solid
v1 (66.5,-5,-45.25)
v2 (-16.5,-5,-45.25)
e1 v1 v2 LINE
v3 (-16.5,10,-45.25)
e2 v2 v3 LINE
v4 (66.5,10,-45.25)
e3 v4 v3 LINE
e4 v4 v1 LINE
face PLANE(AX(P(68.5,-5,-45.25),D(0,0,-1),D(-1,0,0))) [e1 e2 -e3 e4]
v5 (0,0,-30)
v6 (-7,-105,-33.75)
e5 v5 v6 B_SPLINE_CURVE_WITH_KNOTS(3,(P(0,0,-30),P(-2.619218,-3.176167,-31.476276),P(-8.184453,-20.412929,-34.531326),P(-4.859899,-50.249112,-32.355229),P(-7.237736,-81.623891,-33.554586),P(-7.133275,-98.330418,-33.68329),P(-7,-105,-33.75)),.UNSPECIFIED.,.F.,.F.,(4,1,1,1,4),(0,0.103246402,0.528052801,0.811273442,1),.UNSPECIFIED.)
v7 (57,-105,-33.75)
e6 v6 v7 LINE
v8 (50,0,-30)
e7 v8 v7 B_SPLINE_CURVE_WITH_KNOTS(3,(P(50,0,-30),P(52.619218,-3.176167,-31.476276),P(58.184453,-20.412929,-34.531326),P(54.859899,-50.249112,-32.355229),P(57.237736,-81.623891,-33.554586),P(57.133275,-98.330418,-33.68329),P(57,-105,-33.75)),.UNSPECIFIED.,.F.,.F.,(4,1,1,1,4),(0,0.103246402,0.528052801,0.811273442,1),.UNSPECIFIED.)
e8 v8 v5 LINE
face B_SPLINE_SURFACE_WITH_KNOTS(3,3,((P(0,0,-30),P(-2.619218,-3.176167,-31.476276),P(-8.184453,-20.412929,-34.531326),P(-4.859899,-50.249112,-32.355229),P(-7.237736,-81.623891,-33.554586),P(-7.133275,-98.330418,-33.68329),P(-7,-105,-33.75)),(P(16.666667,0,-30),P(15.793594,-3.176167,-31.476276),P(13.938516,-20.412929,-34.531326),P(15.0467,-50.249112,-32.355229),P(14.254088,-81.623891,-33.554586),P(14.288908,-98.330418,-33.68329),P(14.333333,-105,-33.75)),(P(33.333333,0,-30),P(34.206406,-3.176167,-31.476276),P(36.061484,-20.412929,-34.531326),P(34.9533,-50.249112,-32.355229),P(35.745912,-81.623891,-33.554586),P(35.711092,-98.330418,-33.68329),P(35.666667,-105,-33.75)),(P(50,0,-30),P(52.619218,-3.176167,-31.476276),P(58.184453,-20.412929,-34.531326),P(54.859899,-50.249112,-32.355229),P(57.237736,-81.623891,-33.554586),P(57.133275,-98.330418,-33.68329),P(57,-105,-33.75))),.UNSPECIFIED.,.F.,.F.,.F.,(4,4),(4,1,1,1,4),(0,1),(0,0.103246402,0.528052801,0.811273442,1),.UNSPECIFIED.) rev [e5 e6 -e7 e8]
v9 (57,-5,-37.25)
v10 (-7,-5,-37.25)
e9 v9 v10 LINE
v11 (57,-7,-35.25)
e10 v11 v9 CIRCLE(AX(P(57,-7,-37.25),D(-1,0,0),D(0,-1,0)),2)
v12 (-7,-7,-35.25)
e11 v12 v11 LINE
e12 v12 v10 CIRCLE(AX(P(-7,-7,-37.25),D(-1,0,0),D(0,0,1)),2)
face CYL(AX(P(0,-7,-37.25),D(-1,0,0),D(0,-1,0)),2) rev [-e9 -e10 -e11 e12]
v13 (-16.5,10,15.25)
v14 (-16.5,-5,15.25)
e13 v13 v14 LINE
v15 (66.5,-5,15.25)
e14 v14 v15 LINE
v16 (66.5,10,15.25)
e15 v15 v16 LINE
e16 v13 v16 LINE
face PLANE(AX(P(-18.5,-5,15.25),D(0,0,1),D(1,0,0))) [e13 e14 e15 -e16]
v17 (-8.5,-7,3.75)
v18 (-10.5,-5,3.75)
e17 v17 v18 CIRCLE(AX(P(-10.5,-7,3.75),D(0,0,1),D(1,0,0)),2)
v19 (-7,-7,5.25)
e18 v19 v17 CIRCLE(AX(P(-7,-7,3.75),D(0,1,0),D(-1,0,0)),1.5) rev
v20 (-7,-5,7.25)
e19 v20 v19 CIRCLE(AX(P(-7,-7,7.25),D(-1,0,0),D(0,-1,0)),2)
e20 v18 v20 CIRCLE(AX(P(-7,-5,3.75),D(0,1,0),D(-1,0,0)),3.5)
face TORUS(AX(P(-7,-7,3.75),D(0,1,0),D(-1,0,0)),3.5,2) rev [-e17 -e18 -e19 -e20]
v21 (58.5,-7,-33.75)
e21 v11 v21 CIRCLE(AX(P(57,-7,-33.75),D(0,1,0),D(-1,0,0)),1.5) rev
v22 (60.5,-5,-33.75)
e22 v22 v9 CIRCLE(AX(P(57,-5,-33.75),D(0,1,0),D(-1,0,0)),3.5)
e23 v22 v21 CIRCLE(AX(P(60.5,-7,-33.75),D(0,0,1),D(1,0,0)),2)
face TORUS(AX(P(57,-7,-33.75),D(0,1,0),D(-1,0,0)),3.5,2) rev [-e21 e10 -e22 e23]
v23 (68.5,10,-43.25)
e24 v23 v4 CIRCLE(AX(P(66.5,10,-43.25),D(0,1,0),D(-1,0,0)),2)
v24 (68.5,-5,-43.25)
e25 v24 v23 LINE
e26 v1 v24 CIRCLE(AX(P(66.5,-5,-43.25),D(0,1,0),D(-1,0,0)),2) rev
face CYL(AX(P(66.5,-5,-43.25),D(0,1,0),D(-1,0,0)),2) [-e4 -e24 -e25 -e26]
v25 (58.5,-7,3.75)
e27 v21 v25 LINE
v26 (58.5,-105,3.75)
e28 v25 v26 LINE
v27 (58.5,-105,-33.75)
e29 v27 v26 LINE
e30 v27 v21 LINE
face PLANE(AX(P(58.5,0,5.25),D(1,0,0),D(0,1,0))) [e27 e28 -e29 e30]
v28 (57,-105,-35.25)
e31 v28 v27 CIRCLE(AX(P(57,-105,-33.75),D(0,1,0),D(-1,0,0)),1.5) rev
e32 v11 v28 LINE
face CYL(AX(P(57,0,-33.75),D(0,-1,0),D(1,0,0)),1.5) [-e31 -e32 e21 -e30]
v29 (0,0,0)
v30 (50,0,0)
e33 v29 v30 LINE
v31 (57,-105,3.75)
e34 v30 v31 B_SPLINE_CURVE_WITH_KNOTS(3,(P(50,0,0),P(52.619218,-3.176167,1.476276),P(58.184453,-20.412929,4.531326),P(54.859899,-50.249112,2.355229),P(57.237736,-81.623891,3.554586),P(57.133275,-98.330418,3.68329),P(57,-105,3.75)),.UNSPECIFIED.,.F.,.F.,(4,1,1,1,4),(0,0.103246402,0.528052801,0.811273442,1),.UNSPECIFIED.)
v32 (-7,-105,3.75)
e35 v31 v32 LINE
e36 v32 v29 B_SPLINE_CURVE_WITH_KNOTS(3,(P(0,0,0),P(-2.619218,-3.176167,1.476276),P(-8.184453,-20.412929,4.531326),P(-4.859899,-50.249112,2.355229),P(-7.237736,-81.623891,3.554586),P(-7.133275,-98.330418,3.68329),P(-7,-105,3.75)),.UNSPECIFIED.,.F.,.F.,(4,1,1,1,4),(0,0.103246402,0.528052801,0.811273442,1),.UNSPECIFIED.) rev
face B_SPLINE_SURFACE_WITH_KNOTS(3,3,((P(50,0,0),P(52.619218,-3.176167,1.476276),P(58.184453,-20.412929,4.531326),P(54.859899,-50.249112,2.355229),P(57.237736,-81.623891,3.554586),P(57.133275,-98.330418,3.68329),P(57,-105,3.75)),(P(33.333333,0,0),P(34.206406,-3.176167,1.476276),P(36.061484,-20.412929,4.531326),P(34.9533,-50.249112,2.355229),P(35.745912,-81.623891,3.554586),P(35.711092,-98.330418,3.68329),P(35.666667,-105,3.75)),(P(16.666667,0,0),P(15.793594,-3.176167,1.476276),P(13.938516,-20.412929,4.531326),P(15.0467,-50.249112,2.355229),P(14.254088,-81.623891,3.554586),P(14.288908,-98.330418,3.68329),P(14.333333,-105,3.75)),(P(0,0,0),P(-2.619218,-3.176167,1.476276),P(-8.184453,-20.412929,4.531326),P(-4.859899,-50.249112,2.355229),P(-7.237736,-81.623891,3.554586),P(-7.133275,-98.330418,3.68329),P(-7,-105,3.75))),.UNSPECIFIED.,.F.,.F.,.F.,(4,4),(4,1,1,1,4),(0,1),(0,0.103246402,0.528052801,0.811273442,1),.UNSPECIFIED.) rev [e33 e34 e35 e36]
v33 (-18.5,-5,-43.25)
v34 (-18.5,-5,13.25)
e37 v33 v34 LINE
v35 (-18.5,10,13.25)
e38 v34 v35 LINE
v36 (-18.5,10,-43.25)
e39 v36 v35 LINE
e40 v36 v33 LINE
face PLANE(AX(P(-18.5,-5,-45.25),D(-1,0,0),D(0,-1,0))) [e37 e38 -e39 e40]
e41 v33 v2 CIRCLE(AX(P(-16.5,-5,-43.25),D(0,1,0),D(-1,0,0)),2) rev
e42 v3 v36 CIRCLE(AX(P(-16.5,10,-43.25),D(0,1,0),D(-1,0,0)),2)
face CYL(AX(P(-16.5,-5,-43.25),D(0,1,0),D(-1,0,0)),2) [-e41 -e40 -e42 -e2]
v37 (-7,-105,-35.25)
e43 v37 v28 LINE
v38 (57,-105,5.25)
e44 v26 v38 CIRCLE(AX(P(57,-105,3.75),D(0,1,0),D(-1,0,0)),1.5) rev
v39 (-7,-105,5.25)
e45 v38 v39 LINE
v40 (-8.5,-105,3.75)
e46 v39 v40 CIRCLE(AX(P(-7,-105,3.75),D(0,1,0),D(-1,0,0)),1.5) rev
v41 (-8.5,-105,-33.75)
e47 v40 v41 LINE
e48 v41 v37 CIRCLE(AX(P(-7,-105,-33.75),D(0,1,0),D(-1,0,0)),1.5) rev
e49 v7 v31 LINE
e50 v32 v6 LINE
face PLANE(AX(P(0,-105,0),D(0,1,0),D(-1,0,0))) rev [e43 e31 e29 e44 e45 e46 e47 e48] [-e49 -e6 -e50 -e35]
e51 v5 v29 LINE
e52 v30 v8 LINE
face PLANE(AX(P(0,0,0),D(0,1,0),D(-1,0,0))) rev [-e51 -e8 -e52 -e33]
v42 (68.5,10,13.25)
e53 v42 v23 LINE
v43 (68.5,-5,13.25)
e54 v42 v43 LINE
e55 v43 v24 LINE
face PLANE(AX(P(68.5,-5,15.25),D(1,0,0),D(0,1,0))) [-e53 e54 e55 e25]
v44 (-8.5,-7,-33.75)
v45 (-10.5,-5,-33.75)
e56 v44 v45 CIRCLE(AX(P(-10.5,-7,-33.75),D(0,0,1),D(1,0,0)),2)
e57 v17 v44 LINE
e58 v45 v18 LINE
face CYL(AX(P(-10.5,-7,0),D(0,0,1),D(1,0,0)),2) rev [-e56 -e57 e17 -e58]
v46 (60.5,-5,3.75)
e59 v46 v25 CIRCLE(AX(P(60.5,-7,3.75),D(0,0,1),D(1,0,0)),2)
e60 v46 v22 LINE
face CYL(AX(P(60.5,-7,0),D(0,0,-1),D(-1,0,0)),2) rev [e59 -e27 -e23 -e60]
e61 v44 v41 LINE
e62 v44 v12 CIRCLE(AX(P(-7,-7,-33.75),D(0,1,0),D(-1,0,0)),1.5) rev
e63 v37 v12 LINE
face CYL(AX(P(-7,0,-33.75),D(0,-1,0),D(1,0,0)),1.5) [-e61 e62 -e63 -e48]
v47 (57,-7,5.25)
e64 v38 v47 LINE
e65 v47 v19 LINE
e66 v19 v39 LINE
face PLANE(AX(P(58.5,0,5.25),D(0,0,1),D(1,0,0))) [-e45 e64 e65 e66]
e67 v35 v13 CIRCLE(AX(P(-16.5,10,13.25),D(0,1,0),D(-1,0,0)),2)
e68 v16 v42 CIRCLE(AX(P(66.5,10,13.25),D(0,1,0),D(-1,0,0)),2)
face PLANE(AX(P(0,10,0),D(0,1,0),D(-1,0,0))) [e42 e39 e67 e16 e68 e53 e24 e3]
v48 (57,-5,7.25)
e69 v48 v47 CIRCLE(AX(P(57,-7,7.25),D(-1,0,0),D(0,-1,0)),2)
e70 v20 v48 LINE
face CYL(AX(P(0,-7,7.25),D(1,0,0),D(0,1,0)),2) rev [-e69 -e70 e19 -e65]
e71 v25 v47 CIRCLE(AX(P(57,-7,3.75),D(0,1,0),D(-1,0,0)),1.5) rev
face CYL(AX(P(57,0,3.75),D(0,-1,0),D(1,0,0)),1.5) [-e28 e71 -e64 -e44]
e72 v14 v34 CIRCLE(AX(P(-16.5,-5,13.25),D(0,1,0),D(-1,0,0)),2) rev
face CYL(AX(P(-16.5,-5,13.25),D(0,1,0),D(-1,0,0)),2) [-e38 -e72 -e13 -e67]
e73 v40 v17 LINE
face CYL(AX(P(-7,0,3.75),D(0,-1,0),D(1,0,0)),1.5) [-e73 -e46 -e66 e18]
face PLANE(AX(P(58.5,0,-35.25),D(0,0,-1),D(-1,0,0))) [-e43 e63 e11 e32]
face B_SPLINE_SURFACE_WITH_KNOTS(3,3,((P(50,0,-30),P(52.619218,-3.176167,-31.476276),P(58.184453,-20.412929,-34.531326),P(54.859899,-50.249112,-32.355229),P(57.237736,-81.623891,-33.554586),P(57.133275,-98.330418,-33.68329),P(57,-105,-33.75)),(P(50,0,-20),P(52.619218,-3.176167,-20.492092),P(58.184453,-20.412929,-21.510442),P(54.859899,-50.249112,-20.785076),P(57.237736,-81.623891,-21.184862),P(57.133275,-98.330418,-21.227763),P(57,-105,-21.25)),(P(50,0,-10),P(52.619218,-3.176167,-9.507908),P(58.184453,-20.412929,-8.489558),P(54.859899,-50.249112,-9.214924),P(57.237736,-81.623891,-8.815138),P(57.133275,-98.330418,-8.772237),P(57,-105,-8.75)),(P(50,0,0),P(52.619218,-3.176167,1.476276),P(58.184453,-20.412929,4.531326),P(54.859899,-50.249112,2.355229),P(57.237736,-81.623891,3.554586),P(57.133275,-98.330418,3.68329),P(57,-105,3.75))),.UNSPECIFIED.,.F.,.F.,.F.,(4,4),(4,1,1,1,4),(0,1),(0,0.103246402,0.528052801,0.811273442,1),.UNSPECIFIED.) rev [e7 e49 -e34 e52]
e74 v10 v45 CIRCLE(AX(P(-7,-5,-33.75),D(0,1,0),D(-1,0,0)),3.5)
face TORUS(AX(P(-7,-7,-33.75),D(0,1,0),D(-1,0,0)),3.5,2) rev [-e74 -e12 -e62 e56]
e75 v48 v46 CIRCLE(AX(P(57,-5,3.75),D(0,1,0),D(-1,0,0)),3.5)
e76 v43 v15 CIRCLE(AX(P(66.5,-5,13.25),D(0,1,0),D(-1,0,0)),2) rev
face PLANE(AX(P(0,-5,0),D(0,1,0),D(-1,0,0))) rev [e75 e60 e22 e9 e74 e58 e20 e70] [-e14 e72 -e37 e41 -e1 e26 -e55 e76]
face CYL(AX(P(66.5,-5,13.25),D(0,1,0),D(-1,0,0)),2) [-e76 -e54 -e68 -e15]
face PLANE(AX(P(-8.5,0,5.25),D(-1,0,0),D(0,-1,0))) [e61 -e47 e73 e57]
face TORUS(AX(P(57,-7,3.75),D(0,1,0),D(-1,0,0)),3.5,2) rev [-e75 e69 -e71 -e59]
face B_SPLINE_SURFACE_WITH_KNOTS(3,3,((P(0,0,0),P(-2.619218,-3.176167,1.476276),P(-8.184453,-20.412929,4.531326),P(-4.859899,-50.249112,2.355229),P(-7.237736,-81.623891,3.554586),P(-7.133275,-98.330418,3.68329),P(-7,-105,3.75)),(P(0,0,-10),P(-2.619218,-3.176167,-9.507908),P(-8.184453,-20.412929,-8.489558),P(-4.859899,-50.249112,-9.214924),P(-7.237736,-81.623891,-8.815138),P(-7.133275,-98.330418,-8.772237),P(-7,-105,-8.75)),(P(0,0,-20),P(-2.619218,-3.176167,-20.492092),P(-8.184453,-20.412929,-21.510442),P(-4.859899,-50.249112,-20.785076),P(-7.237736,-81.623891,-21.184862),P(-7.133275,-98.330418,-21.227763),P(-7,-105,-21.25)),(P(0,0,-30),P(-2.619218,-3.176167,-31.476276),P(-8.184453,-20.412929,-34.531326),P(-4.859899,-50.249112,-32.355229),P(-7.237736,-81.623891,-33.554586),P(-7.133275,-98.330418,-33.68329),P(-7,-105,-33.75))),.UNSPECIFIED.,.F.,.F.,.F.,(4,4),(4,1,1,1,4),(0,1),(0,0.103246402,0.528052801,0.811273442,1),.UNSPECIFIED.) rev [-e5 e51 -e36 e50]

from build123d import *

# Parameters (mm, degrees)
SKETCH6_W           = 67
SKETCH6_H           = 40.5
BOSS_EXTRUDE1_DEPTH = 105
CUT_LOFT3_START     = -29.9999999
CUT_LOFT3_DEPTH     = 29.9999998
CUT_LOFT3_START_2   = -7.115817743
CUT_LOFT3_2_DEPTH   = 64.231635486
CUT_LOFT3_START_3   = -35
CUT_LOFT3_3_DEPTH   = 40
SKETCH7_W           = 67
SKETCH7_H           = 40.5
BOSS_EXTRUDE2_DEPTH = 10
SKETCH8_W           = 87
SKETCH8_H           = 60.5
SKETCH8_W_2         = 67
SKETCH8_H_2         = 40.5
BOSS_EXTRUDE3_DEPTH = 15
FILLET1_R           = 1.5
FILLET2_R           = 2


with BuildPart() as part:
    # Sketch6 → Boss-Extrude1 (new body)
    with BuildSketch(Plane(origin=(0, -105, 0), x_dir=(-1, 0, 0), z_dir=(0, -1, 0))):
        with Locations((-25, 15)):
            Rectangle(SKETCH6_W, SKETCH6_H)
    extrude(amount=-BOSS_EXTRUDE1_DEPTH)

    # Cut-Loft3: read off the stored shape, not the designer's step
    # Cut-Loft3 outline → Cut-Loft3 (cut)
    with BuildSketch(Plane.XY.offset(CUT_LOFT3_START)):
        with BuildLine():
            Line((50, 0), (0, 0))
            add(Edge.make_bspline(
                [(0, 0), (-2.619218241, -3.17616721), (-8.184453474, -20.412928603), (-4.859899163, -50.249112036), (-7.237735503, -81.623890808), (-7.133275036, -98.330418488), (-7, -105)],
                knots=[0, 0, 0, 0, 0.103246402, 0.528052801, 0.811273442, 1, 1, 1, 1], degree=3))
            Line((-7, -105), (57, -105))
            add(Edge.make_bspline(
                [(50, 0), (52.619218241, -3.17616721), (58.184453474, -20.412928603), (54.859899163, -50.249112036), (57.237735503, -81.623890808), (57.133275036, -98.330418488), (57, -105)],
                knots=[0, 0, 0, 0, 0.103246402, 0.528052801, 0.811273442, 1, 1, 1, 1], degree=3))
        make_face()
    extrude(amount=CUT_LOFT3_DEPTH, mode=Mode.SUBTRACT)

    # Cut-Loft3 2 outline → Cut-Loft3 2 (cut)
    with BuildSketch(Plane.YZ.offset(CUT_LOFT3_START_2)):
        with BuildLine():
            Line((-105, 3.75), (-105, -1e-07))
            Line((-105, -1e-07), (0, 0))
            add(Edge.make_bspline(
                [(0, 0), (-3.17616721, 1.476275787), (-20.412928603, 4.531326169), (-50.249112036, 2.35522903), (-81.623890808, 3.554586021), (-98.330418488, 3.683289611), (-105, 3.75)],
                knots=[0, 0, 0, 0, 0.103246402, 0.528052801, 0.811273442, 1, 1, 1, 1], degree=3))
        make_face()
        with BuildLine():
            add(Edge.make_bspline(
                [(0, -30), (-3.17616721, -31.476275787), (-20.412928603, -34.531326169), (-50.249112036, -32.35522903), (-81.623890808, -33.554586021), (-98.330418488, -33.683289611), (-105, -33.75)],
                knots=[0, 0, 0, 0, 0.103246402, 0.528052801, 0.811273442, 1, 1, 1, 1], degree=3))
            Line((0, -30), (-105, -29.9999999))
            Line((-105, -29.9999999), (-105, -33.75))
        make_face()
    extrude(amount=CUT_LOFT3_2_DEPTH, mode=Mode.SUBTRACT)

    # Cut-Loft3 3 outline → Cut-Loft3 3 (add)
    with BuildSketch(Plane.XY.offset(CUT_LOFT3_START_3)):
        with BuildLine():
            add(Edge.make_bspline(
                [(-7.115817743, -94.852346436), (-7.111621237, -98.234097595), (-7.067571178, -101.618485404), (-7, -105)],
                knots=[0.904314594, 0.904314594, 0.904314594, 0.904314594, 1, 1, 1, 1], degree=3))
            Line((-7.115817743, -94.852346436), (-7.115817743, -105))
            Line((-7.115817743, -105), (-7, -105))
        make_face()
        with BuildLine():
            Line((57.115817743, -105), (57.115817743, -94.852346435))
            add(Edge.make_bspline(
                [(57.115817743, -94.852346435), (57.111621237, -98.234097594), (57.067571178, -101.618485403), (57, -105)],
                knots=[0.904314594, 0.904314594, 0.904314594, 0.904314594, 1, 1, 1, 1], degree=3))
            Line((57, -105), (57.115817743, -105))
        make_face()
        with BuildLine():
            Line((0, 0), (-7.115817743, 0))
            Line((-7.115817743, 0), (-7.115817743, -93.799100649))
            add(Edge.make_bspline(
                [(0, 0), (-2.619218241, -3.17616721), (-8.184453474, -20.412928603), (-4.859899163, -50.249112036), (-6.957672976, -77.928556656), (-7.11212194, -90.862443231), (-7.115817743, -93.799100649)],
                knots=[0, 0, 0, 0, 0.103246402, 0.528052801, 0.811273442, 0.894379998, 0.894379998, 0.894379998, 0.894379998], degree=3))
        make_face()
        with BuildLine():
            Line((57.115817743, 0), (50, 0))
            add(Edge.make_bspline(
                [(50, 0), (52.619218241, -3.17616721), (58.184453474, -20.412928603), (54.859899163, -50.249112036), (56.957672976, -77.928556656), (57.11212194, -90.862443232), (57.115817743, -93.79910065)],
                knots=[0, 0, 0, 0, 0.103246402, 0.528052801, 0.811273442, 0.894379998, 0.894379998, 0.894379998, 0.894379998], degree=3))
            Line((57.115817743, -93.79910065), (57.115817743, 0))
        make_face()
    extrude(amount=CUT_LOFT3_3_DEPTH)

    # Sketch7 → Boss-Extrude2 (add)
    with BuildSketch(Plane(origin=(0, 0, 0), x_dir=(1, 0, 0), z_dir=(0, 1, 0))):
        with Locations((25, 15)):
            Rectangle(SKETCH7_W, SKETCH7_H)
    extrude(amount=BOSS_EXTRUDE2_DEPTH)

    # Sketch8 → Boss-Extrude3 (add)
    with BuildSketch(Plane(origin=(0, 10, 0), x_dir=(1, 0, 0), z_dir=(0, 1, 0))):
        with Locations((25, 15)):
            Rectangle(SKETCH8_W, SKETCH8_H)
        with Locations((25, 15)):
            Rectangle(SKETCH8_W_2, SKETCH8_H_2, mode=Mode.SUBTRACT)
    extrude(amount=-BOSS_EXTRUDE3_DEPTH)

    # Fillet1
    fillet1_edges = [part.edges().sort_by_distance(p)[0] for p in [
        (-8.5, -55, -35.25),
        (58.5, -55, -35.25),
        (58.5, -55, 5.25),
        (-8.5, -55, 5.25),
    ]]
    fillet(fillet1_edges, radius=FILLET1_R)

    # Fillet2
    fillet2_edges = [part.edges().sort_by_distance(p)[0] for p in [
        (68.5, 2.5, -45.25),
        (68.5, 2.5, 15.25),
        (-18.5, 2.5, 15.25),
        (-18.5, 2.5, -45.25),
        (25, -5, 5.25),
        (-8.5, -5, -15),
        (58.5, -5, -15),
        (25, -5, -35.25),
        (-8.060660172, -5, 4.810660172),
        (58.060660172, -5, 4.810660172),
        (58.060660172, -5, -34.810660172),
        (-8.060660172, -5, -34.810660172),
    ]]
    fillet(fillet2_edges, radius=FILLET2_R)


solid = part.part
